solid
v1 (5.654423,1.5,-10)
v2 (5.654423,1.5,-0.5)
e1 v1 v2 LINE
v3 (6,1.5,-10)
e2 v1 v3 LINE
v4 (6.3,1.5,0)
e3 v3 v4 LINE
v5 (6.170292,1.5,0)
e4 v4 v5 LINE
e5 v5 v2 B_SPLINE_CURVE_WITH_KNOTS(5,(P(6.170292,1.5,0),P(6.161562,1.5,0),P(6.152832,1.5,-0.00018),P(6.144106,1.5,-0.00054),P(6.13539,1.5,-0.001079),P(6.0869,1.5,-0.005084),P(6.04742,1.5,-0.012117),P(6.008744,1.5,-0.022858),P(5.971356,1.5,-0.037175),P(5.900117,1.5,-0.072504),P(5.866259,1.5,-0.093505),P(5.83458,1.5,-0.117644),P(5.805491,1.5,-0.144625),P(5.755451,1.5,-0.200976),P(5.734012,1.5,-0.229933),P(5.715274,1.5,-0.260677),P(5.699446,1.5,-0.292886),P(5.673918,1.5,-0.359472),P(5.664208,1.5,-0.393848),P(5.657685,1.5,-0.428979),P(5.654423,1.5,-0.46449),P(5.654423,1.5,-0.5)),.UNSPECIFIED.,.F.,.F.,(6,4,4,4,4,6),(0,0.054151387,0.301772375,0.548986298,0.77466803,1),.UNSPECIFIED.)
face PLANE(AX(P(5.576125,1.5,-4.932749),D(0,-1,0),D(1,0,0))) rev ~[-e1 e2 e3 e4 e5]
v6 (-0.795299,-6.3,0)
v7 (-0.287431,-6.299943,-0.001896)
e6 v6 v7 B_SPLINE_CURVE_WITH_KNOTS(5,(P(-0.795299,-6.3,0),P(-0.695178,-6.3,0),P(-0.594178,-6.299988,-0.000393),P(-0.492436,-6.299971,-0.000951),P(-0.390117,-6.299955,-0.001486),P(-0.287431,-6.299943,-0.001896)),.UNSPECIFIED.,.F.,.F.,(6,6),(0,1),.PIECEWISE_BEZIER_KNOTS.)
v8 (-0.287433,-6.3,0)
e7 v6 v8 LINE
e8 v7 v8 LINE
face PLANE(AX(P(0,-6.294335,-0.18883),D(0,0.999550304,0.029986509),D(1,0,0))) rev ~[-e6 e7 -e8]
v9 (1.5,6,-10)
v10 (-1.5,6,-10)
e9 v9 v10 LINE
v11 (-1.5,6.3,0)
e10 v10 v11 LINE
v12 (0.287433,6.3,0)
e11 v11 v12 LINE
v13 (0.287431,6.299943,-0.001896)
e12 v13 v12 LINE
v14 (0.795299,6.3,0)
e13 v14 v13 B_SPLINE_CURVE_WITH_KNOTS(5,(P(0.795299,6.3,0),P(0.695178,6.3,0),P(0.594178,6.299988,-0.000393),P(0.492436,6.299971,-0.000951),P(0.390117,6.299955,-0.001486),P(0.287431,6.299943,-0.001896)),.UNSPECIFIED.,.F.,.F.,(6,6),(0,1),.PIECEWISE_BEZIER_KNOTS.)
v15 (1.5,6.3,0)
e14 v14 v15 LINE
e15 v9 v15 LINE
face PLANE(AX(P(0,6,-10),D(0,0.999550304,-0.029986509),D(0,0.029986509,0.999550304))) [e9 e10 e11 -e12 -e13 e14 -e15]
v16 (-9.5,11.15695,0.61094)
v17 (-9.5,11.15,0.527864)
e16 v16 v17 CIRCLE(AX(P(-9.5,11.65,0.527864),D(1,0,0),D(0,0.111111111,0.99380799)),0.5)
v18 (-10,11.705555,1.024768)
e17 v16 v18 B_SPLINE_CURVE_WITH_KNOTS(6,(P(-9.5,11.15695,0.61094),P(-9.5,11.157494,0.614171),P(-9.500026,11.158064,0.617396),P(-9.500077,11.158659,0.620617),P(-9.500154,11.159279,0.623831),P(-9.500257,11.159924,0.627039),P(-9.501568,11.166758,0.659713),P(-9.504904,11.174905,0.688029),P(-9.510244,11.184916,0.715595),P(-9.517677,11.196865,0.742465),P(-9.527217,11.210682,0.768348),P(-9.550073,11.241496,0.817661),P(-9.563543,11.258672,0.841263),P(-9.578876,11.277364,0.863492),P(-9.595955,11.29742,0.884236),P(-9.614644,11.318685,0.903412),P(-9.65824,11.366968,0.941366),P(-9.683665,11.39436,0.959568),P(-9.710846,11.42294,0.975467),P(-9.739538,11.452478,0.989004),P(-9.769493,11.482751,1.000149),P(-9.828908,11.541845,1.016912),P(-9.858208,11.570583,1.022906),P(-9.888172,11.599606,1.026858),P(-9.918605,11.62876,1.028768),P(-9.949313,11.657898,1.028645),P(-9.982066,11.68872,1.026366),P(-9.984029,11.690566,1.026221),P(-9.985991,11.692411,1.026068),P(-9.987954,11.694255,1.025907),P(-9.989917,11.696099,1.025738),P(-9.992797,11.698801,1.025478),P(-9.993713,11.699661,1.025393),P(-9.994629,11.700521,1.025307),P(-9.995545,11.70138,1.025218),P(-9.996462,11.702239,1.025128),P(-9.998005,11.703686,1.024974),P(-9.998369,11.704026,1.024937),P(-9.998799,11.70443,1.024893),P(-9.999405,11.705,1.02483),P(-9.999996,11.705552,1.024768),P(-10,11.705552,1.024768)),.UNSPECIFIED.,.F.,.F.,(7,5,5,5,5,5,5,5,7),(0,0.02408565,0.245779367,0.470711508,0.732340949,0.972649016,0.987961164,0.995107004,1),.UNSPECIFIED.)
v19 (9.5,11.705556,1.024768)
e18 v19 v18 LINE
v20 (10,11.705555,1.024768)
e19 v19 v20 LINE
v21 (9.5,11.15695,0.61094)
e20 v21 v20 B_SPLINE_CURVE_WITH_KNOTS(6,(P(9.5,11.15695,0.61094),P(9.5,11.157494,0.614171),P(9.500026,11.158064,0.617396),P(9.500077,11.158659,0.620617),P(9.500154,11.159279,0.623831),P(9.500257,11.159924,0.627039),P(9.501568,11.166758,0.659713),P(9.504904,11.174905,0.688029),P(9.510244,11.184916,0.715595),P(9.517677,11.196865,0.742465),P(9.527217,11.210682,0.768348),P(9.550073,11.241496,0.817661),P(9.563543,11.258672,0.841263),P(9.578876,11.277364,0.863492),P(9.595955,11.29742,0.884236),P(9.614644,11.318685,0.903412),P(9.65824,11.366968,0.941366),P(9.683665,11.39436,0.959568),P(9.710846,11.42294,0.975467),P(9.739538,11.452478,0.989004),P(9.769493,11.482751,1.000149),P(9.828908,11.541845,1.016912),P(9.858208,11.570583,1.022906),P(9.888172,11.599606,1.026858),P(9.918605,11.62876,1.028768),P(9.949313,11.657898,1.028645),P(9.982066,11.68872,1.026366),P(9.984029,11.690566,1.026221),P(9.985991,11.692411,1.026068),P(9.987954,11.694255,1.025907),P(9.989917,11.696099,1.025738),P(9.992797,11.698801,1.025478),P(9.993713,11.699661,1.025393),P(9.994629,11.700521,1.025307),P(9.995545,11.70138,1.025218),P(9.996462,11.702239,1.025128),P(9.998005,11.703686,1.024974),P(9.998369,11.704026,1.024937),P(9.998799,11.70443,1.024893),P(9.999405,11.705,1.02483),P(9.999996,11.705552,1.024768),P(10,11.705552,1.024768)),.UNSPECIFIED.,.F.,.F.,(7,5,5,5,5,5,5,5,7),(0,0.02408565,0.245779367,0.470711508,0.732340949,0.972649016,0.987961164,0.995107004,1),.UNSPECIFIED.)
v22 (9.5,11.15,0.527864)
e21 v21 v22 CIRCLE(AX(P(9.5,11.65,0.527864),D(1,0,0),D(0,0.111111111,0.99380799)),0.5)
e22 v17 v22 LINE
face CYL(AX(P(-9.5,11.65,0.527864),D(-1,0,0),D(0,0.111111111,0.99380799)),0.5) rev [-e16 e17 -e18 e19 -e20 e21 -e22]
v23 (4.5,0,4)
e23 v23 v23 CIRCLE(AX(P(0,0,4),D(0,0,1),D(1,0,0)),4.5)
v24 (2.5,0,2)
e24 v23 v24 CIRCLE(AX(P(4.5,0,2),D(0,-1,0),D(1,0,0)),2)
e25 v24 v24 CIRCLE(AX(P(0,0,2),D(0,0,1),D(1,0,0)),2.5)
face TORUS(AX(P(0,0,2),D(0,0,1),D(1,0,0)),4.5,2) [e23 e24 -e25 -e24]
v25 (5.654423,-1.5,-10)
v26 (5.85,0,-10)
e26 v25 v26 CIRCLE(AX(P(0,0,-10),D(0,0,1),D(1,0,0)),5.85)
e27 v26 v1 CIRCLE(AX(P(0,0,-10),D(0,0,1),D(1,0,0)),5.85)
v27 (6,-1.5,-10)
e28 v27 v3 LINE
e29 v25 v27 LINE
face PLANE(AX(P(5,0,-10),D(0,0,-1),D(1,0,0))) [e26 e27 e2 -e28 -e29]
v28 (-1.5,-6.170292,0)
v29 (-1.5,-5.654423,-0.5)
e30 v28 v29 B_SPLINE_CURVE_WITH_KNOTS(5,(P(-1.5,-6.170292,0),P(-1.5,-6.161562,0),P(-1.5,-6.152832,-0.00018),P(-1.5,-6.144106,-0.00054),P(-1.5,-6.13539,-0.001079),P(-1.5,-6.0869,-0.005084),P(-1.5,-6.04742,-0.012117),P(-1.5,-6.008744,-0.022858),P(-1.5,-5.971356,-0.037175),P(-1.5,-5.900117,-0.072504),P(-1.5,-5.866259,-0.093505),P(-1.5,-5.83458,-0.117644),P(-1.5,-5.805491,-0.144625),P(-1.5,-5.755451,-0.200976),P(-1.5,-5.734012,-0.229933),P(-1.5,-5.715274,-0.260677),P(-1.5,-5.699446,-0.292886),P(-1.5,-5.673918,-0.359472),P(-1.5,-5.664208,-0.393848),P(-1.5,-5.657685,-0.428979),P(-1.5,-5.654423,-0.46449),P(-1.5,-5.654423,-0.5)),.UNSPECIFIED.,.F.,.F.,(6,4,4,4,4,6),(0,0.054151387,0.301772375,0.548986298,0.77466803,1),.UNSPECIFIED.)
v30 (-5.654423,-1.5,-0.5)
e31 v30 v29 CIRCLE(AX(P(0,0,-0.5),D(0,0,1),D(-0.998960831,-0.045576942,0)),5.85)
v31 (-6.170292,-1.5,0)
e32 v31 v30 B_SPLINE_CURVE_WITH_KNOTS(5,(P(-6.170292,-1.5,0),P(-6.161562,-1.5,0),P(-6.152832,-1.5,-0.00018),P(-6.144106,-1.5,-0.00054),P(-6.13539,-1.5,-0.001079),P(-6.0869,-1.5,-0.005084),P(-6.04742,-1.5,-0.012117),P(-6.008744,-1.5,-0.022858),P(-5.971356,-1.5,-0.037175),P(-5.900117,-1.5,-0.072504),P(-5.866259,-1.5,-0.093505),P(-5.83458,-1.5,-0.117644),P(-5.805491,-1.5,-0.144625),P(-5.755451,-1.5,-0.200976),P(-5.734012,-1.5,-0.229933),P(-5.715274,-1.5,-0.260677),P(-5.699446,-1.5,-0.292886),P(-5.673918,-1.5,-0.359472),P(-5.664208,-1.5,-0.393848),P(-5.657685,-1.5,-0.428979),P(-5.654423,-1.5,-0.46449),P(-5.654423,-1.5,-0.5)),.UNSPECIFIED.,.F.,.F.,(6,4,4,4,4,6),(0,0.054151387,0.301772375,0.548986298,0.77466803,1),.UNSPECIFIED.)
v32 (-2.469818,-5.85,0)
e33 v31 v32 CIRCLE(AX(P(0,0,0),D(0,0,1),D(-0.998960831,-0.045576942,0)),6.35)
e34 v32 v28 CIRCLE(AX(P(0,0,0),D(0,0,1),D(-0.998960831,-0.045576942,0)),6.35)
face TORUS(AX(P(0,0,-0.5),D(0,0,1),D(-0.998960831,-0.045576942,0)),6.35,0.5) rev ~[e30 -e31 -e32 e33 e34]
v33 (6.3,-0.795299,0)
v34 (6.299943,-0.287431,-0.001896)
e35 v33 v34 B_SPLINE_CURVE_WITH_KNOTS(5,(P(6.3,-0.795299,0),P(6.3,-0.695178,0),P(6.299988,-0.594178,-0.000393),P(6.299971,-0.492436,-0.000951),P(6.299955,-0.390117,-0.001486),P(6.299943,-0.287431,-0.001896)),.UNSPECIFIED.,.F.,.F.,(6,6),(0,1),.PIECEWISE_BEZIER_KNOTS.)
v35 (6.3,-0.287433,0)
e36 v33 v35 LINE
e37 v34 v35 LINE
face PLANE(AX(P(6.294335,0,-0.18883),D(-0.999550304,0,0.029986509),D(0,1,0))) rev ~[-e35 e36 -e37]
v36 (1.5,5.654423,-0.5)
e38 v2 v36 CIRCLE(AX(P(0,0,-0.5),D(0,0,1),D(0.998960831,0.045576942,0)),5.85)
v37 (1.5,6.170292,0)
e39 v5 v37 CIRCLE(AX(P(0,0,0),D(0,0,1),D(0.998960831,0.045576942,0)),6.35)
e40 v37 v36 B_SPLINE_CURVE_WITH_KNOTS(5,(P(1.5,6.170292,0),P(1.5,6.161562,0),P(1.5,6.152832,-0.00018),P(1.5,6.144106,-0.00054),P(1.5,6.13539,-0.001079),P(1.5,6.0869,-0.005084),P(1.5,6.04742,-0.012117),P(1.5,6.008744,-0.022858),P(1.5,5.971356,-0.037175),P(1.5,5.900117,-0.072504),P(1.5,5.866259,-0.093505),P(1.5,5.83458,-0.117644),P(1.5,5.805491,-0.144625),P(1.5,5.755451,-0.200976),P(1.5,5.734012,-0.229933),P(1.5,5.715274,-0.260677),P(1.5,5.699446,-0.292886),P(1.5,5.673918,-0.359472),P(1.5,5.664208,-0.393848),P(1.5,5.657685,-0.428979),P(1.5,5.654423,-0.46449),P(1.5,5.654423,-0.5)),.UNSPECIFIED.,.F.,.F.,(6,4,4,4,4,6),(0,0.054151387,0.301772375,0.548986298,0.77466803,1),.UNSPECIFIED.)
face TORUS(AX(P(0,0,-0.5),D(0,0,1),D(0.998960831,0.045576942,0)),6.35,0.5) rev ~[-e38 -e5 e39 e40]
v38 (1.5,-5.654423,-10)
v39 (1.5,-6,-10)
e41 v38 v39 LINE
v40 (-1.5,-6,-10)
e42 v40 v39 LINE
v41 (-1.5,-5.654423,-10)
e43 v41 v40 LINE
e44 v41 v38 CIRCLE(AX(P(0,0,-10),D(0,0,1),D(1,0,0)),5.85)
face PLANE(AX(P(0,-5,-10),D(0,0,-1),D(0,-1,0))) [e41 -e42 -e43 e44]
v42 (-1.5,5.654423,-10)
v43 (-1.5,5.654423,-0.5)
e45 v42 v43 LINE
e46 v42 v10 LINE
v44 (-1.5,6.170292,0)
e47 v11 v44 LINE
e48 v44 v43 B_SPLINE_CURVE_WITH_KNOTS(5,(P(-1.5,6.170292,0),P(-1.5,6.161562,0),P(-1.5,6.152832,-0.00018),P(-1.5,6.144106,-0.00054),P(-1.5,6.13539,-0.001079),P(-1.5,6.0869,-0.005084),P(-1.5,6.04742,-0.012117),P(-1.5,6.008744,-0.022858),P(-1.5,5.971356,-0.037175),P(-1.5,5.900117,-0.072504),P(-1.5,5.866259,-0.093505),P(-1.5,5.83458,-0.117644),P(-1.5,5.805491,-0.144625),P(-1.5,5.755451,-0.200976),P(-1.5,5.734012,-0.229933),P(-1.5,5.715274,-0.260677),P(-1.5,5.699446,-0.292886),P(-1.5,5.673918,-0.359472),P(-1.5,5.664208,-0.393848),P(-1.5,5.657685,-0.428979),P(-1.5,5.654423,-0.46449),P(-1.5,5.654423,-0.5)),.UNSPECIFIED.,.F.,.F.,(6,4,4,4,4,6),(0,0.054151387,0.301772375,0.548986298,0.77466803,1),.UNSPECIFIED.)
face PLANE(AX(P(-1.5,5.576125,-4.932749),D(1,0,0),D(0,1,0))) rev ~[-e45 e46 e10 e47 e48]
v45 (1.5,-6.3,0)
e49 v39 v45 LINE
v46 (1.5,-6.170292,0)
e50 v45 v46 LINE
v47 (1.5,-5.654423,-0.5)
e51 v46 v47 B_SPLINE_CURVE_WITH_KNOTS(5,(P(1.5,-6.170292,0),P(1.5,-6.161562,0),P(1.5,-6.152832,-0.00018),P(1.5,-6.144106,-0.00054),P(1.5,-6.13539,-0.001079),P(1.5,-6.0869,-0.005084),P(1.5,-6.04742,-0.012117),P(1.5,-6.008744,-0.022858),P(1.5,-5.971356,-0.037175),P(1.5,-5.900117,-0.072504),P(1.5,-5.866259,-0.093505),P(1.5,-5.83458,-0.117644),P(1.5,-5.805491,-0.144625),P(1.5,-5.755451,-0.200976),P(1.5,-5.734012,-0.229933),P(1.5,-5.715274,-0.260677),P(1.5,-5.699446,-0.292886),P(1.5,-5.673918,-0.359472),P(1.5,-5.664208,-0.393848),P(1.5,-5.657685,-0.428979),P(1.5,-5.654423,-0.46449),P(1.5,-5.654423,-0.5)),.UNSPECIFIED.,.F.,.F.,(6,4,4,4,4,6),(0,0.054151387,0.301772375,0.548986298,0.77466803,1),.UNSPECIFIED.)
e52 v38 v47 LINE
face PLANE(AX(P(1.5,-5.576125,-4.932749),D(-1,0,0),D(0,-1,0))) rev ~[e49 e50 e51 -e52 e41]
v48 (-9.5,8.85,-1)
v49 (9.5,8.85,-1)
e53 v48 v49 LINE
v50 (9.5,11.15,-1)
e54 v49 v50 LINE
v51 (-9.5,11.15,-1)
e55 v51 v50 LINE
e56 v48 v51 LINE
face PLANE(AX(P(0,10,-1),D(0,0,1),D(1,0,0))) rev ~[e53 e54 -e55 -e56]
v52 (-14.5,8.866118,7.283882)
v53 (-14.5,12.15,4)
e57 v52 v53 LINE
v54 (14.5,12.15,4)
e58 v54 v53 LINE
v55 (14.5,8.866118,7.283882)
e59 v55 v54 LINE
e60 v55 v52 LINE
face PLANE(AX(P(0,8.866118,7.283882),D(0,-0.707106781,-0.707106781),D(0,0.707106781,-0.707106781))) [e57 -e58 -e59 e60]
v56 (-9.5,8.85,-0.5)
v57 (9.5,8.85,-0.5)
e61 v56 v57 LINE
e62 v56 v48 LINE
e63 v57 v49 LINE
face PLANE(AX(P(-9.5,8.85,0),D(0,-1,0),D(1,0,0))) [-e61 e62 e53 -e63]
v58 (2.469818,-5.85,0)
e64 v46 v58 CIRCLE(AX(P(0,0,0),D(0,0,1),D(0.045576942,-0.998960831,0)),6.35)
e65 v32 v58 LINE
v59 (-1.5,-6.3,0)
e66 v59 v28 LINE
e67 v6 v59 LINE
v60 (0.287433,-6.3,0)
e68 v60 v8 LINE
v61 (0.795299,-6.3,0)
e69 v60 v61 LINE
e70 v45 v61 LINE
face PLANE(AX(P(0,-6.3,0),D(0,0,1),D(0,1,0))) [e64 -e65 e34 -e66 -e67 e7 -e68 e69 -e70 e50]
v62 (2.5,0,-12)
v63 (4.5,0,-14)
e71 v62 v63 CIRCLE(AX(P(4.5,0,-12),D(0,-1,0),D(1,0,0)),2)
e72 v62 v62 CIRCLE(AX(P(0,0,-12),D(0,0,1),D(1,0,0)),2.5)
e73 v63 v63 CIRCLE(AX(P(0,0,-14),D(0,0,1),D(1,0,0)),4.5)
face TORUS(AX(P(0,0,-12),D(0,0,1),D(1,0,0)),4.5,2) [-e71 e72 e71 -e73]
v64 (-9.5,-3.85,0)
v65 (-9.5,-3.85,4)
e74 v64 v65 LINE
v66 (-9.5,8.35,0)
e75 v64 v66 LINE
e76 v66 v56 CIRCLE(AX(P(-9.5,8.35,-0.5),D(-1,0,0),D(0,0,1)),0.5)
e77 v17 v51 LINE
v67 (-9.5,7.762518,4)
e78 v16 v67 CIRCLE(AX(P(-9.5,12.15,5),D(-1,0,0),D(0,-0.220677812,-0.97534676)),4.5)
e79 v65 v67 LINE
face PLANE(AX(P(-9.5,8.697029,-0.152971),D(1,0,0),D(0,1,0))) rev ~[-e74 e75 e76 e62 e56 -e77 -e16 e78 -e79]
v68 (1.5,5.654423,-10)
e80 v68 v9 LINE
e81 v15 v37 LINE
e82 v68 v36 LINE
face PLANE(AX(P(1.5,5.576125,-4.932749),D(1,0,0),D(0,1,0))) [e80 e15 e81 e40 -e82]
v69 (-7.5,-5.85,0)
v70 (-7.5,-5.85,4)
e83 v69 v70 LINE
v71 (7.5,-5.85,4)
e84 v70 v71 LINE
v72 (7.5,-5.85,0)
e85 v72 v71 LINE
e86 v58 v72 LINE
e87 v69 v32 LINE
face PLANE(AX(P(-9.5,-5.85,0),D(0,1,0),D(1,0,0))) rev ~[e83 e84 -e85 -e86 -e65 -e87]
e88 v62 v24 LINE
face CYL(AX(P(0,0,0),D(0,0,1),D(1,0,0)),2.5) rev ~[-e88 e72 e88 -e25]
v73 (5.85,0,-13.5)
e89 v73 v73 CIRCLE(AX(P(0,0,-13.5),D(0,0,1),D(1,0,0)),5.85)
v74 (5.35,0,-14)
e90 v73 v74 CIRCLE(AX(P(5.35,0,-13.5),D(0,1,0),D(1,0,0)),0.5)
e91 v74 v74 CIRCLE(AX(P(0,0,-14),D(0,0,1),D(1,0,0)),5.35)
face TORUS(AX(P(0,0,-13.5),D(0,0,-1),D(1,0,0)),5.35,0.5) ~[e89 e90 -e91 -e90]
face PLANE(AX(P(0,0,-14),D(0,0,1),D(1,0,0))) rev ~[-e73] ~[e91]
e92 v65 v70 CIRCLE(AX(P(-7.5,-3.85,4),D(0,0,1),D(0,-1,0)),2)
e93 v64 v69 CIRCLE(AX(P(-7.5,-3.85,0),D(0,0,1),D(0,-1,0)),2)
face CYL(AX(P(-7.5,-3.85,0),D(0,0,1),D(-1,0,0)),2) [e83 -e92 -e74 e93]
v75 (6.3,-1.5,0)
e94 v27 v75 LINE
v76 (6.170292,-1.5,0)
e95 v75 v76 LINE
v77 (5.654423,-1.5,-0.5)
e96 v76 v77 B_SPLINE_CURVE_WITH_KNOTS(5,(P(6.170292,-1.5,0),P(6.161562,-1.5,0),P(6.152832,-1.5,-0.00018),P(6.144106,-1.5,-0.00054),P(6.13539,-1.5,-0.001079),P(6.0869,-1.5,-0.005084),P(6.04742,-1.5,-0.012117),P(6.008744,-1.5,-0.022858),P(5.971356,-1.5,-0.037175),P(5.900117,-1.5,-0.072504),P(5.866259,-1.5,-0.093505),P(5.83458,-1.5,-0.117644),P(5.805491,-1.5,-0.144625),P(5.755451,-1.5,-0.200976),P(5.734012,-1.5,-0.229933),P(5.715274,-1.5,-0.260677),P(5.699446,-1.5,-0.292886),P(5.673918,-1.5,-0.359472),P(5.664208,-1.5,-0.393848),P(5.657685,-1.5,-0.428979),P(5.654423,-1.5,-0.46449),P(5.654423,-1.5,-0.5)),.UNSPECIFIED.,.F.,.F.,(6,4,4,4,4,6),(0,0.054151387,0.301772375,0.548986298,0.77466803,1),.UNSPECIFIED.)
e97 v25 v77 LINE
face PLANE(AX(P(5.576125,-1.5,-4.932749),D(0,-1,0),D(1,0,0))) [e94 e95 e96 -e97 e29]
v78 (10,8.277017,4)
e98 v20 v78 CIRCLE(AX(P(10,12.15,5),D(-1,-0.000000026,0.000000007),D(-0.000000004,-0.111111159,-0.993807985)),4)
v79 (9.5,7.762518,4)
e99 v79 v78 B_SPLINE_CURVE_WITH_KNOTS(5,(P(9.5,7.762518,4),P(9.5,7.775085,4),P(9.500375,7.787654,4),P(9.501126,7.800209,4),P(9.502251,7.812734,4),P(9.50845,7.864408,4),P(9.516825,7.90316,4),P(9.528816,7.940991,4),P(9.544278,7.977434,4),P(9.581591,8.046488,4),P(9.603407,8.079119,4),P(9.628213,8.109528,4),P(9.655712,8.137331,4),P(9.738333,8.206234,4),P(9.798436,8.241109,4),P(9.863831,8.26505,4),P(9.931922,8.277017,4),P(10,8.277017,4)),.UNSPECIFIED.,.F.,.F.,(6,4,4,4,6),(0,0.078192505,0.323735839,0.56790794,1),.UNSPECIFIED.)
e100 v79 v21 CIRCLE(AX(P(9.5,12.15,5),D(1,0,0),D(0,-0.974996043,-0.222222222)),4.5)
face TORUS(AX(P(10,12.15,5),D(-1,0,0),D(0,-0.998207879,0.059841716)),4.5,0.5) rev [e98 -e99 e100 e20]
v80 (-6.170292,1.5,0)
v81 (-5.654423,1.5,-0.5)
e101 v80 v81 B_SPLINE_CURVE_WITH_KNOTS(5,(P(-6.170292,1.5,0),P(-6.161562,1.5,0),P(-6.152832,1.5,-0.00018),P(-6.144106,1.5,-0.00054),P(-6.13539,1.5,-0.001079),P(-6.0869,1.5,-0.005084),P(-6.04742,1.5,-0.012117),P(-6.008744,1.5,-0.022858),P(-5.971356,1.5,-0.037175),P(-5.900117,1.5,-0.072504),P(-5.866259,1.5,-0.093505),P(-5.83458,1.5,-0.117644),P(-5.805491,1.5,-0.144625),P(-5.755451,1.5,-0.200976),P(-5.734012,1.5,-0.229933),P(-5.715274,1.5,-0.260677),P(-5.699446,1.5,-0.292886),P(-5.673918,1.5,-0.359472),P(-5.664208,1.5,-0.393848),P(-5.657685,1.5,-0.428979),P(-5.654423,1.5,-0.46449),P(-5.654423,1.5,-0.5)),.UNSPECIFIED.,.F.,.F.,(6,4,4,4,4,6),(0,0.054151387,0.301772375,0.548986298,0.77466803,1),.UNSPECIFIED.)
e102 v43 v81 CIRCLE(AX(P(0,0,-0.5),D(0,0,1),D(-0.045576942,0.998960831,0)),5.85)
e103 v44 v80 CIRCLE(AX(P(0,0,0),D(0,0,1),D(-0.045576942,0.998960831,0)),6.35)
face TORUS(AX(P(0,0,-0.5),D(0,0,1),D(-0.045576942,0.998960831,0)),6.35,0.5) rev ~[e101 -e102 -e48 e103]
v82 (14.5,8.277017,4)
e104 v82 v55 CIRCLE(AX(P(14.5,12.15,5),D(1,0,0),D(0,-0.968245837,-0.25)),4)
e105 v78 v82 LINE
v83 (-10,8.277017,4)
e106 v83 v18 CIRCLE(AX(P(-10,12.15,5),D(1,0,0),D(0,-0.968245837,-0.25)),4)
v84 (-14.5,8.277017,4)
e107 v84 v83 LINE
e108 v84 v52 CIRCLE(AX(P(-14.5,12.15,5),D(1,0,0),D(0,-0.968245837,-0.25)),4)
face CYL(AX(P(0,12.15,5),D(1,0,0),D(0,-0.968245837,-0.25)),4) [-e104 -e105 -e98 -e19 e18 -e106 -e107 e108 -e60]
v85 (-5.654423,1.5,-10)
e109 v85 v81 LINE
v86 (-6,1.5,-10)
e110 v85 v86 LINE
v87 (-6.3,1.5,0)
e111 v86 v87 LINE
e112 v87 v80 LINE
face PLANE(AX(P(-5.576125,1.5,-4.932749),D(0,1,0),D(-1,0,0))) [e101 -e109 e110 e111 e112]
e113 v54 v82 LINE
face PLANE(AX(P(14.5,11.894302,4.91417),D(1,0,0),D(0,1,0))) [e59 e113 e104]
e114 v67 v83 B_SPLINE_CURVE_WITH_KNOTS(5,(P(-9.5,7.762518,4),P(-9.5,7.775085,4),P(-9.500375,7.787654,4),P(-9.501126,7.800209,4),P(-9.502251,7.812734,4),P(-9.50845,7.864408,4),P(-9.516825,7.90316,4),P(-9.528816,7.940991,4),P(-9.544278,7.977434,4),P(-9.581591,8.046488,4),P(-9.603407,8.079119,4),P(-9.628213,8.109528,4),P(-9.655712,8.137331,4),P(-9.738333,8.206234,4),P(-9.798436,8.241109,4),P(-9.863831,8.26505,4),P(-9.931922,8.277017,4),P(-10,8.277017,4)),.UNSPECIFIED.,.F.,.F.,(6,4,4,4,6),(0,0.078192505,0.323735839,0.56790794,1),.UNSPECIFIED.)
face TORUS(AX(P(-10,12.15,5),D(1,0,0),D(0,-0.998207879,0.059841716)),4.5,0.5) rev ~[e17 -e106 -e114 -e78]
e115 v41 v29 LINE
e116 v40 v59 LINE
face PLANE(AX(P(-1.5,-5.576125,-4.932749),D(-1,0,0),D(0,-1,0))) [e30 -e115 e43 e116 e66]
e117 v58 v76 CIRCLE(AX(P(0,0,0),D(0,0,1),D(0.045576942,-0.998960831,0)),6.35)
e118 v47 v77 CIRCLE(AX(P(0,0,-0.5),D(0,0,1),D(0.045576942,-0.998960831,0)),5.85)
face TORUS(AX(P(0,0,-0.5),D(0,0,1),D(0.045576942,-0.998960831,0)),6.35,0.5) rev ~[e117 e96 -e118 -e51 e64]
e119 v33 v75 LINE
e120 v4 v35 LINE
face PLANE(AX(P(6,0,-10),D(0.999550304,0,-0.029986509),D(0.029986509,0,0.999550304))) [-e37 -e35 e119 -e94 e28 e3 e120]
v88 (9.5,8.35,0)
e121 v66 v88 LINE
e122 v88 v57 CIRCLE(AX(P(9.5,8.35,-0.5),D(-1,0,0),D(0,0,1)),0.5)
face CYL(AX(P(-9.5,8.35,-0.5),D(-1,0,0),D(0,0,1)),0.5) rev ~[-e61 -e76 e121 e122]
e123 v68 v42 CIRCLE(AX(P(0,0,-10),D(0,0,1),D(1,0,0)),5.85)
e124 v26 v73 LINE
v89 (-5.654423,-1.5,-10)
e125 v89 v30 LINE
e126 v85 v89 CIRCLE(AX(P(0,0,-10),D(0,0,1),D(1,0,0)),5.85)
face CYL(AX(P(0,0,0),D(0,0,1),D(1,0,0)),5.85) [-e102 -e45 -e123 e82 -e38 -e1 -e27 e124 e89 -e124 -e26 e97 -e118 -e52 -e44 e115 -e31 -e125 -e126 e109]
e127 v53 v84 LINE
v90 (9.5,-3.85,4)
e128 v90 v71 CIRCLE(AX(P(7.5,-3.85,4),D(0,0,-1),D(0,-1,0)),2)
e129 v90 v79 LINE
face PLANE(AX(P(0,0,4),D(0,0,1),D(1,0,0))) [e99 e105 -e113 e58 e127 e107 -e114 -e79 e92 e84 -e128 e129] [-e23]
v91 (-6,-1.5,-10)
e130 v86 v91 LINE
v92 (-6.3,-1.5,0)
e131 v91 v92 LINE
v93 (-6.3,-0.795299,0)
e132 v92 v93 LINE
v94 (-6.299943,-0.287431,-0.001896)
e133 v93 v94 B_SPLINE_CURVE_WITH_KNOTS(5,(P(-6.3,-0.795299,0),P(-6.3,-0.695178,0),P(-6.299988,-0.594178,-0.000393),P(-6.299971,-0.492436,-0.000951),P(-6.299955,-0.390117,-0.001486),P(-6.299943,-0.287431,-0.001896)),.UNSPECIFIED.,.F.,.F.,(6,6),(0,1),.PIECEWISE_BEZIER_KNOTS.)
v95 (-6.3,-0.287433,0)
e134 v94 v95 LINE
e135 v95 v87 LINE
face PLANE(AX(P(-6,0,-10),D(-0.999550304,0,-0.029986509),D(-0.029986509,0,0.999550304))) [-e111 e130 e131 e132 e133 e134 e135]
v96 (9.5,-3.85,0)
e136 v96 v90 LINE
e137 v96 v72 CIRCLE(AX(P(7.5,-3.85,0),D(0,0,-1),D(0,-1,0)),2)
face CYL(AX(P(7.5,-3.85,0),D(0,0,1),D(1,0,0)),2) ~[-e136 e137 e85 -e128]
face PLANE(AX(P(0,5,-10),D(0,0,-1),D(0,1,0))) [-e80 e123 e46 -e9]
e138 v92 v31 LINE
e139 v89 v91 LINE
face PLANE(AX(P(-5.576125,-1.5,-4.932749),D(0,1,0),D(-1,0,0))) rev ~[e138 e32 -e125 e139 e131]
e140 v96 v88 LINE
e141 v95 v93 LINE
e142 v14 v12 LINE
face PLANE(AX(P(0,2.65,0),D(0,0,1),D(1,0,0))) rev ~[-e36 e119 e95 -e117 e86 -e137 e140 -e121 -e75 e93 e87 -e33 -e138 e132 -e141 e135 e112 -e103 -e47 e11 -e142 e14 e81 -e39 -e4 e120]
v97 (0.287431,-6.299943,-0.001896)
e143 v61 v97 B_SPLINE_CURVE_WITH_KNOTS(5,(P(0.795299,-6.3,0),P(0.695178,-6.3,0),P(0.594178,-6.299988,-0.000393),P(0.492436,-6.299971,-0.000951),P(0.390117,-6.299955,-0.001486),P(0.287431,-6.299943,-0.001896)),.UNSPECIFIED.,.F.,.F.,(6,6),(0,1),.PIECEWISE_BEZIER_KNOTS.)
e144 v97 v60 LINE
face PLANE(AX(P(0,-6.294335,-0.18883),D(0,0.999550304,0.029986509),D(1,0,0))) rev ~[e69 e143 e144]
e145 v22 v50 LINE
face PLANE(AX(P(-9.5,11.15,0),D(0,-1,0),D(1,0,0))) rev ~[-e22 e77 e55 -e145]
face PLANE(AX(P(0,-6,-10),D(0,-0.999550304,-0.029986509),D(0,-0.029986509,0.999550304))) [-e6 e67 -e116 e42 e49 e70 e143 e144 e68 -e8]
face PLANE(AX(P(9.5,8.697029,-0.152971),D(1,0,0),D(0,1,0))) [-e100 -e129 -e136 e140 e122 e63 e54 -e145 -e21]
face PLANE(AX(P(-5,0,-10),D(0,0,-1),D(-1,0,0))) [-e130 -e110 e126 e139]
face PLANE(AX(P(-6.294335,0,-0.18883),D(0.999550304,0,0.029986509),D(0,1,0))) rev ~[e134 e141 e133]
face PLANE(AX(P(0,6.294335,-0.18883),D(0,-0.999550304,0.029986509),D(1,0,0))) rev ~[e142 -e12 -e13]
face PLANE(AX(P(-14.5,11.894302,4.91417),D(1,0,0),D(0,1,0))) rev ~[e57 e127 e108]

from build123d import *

# Parameters (mm, degrees)
F0_R            = 5.85
F1_DEPTH        = 14
F2_W            = 19
F2_H            = 17
F3_DEPTH        = 4
F4_W            = 19
F4_H            = 2.3
F5_DEPTH        = 1
F7_DEPTH        = 1.5
F7_COPIES_COUNT = 4
F9_DEPTH        = 14.5
F10_R           = 2.5
F11_DEPTH       = 15
F12_R           = 2
F13_T1_DEPTH    = 19
F13_T6_ANGLE    = 84.7754573572
F13_T12_ANGLE   = 84.7754573572
F13_T18_ANGLE   = 84.7754573572
F13_T24_ANGLE   = 84.7754573572
F13_T30_ANGLE   = 96.86145484
F13_T36_ANGLE   = 96.86145484
F13_T43_ANGLE   = 96.86145484
F13_T47_DEPTH   = 20.497881522
F13_T54_ANGLE   = 96.86145484
F13_T58_DEPTH   = 20.497881522


# Not quite as in the source:
# - a fillet or chamfer that OpenCascade refuses, or shapes differently, is made with other operations: its cross-section is extruded or revolved along the edge and cut away or added
# - a pattern or mirror of a feature is missing from the dataset's text; its kind, count and spacing are read off the source's solid


with BuildPart() as f1:
    # F0 (on Top) → F1 (new body)
    with BuildSketch(Plane.XY):
        Circle(F0_R)
    extrude(amount=-F1_DEPTH)

    # F2 (on Top) → F3 (join)
    with BuildSketch(Plane.XY):
        with Locations((0, 2.65)):
            Rectangle(F2_W, F2_H)
    extrude(amount=F3_DEPTH)

    # F4 (on Top) → F5 (join)
    with BuildSketch(Plane.XY):
        with Locations((0, 10)):
            Rectangle(F4_W, F4_H)
    extrude(amount=-F5_DEPTH)

    # F6 (on Front) → F7 (join, symmetric)
    with BuildSketch(Plane.XZ):
        Polygon((6, -10), (6.3, 0), (5, 0), (5, -10), align=None)
    f7 = extrude(amount=F7_DEPTH, both=True)

    # F7_copies: F7 ×4 about axis
    f7_copies_axis = Axis((0, 0, 0), (0, 0, 1))
    for i in range(1, F7_COPIES_COUNT):
        add(f7.rotate(f7_copies_axis, i * 360 / F7_COPIES_COUNT))

    # F8 (on Right) → F9 (join, symmetric)
    with BuildSketch(Plane.YZ):
        with BuildLine():
            Line((12.15, 4), (8.2770166538, 4))
            ThreePointArc((8.2770166538, 4), (16.0871501864, 4.2937079857), (8.8661178186, 7.2838821814))
            Line((8.8661178186, 7.2838821814), (12.15, 4))
        make_face()
    extrude(amount=F9_DEPTH, both=True)

    # F10 (on Top) → F11 (cut, symmetric)
    with BuildSketch(Plane.XY):
        Circle(F10_R)
    extrude(amount=F11_DEPTH, both=True, mode=Mode.SUBTRACT)

    # F12
    f12_edges = [f1.edges().sort_by_distance(p)[0] for p in [
        (-9.5, -5.85, 2),
        (9.5, -5.85, 2),
        (-2.5, 0, -14),
        (-2.5, 0, 4),
    ]]
    fillet(f12_edges, radius=F12_R)

    # F13: fillet of radius 0.5 on 9 edges, made by hand

    # F13_s2 → F13_t1 (join)
    with BuildSketch(Plane.YZ.offset(-9.5)):
        with BuildLine():
            ThreePointArc((8.35, 0), (8.7035533906, -0.1464466094), (8.85, -0.5))
            Line((8.85, -0.5), (8.85, 0))
            Line((8.85, 0), (8.35, 0))
        make_face()
        with BuildLine():
            ThreePointArc((11.7055555556, 1.02476804), (11.3166666667, 0.9005420413), (11.15, 0.527864045))
            Line((11.15, 0.527864045), (11.15, 1.1270166538))
            ThreePointArc((11.15, 1.1270166538), (11.4259705579, 1.0660730349), (11.7055555556, 1.02476804))
        make_face()
    extrude(amount=F13_T1_DEPTH)


with BuildPart() as f13_tool4:
    # F13_s5 → F13_t6 (revolve)
    with BuildSketch(Plane(origin=(0, 0, 0), x_dir=(0, 0, 1), z_dir=(-0.9989608313, -0.0455769416, 0))):
        with BuildLine():
            ThreePointArc((0, -6.35), (-0.1464466094, -5.9964466094), (-0.5, -5.85))
            Line((-0.5, -5.85), (0, -5.85))
            Line((0, -5.85), (0, -6.35))
        make_face()
    revolve(axis=Axis((0, 0, 0), (0, 0, 1)), revolution_arc=F13_T6_ANGLE)

    split(bisect_by=Plane(origin=(6.2943350984, 0, -0.188830053), x_dir=(0, 1, 0), z_dir=(-0.9995503035, 0, 0.0299865091)), keep=Keep.TOP)

    split(bisect_by=Plane(origin=(0, -6.2943350984, -0.188830053), x_dir=(1, 0, 0), z_dir=(0, 0.9995503035, 0.0299865091)), keep=Keep.TOP)


with BuildPart() as f1_1:
    add(f1.part)

    # F13_t3: union F13_tool4
    add(f13_tool4.part)


with BuildPart() as f13_tool10:
    # F13_s11 → F13_t12 (revolve)
    with BuildSketch(Plane(origin=(0, 0, 0), x_dir=(0, 0, 1), z_dir=(0.0455769416, -0.9989608313, 0))):
        with BuildLine():
            ThreePointArc((0, -6.35), (-0.1464466094, -5.9964466094), (-0.5, -5.85))
            Line((-0.5, -5.85), (0, -5.85))
            Line((0, -5.85), (0, -6.35))
        make_face()
    revolve(axis=Axis((0, 0, 0), (0, 0, 1)), revolution_arc=F13_T12_ANGLE)

    split(bisect_by=Plane.XZ.offset(-1.5), keep=Keep.BOTTOM)

    split(bisect_by=Plane(origin=(0, 6.2943350984, -0.188830053), x_dir=(1, 0, 0), z_dir=(0, -0.9995503035, 0.0299865091)), keep=Keep.TOP)


with BuildPart() as f1_2:
    add(f1_1.part)

    # F13_t9: union F13_tool10
    add(f13_tool10.part)


with BuildPart() as f13_tool16:
    # F13_s17 → F13_t18 (revolve)
    with BuildSketch(Plane(origin=(0, 0, 0), x_dir=(0, 0, 1), z_dir=(0.9989608313, 0.0455769416, 0))):
        with BuildLine():
            ThreePointArc((0, -6.35), (-0.1464466094, -5.9964466094), (-0.5, -5.85))
            Line((-0.5, -5.85), (0, -5.85))
            Line((0, -5.85), (0, -6.35))
        make_face()
    revolve(axis=Axis((0, 0, 0), (0, 0, 1)), revolution_arc=F13_T18_ANGLE)

    split(bisect_by=Plane.XZ.offset(-1.5), keep=Keep.BOTTOM)

    split(bisect_by=Plane.YZ.offset(-1.5), keep=Keep.BOTTOM)


with BuildPart() as f1_3:
    add(f1_2.part)

    # F13_t15: union F13_tool16
    add(f13_tool16.part)


with BuildPart() as f13_tool22:
    # F13_s23 → F13_t24 (revolve)
    with BuildSketch(Plane(origin=(0, 0, 0), x_dir=(0, 0, 1), z_dir=(-0.0455769416, 0.9989608313, 0))):
        with BuildLine():
            ThreePointArc((0, -6.35), (-0.1464466094, -5.9964466094), (-0.5, -5.85))
            Line((-0.5, -5.85), (0, -5.85))
            Line((0, -5.85), (0, -6.35))
        make_face()
    revolve(axis=Axis((0, 0, 0), (0, 0, 1)), revolution_arc=F13_T24_ANGLE)

    split(bisect_by=Plane(origin=(-6.2943350984, 0, -0.188830053), x_dir=(0, 1, 0), z_dir=(0.9995503035, 0, 0.0299865091)), keep=Keep.TOP)

    split(bisect_by=Plane(origin=(0, -6.2943350984, -0.188830053), x_dir=(1, 0, 0), z_dir=(0, 0.9995503035, 0.0299865091)), keep=Keep.TOP)


with BuildPart() as f1_4:
    add(f1_3.part)

    # F13_t21: union F13_tool22
    add(f13_tool22.part)


with BuildPart() as f13_tool28:
    # F13_s29 → F13_t30 (revolve)
    with BuildSketch(Plane(origin=(0, 0.3421818863, 5.7078686812), x_dir=(1, 0, 0), z_dir=(0, 0.0598417157, 0.9982078787))):
        with BuildLine():
            ThreePointArc((-9.5, 7.3290171475), (-9.6464466094, 7.6825705381), (-10, 7.8290171475))
            Line((-10, 7.8290171475), (-9.5, 7.8290171475))
            Line((-9.5, 7.8290171475), (-9.5, 7.3290171475))
        make_face()
    revolve(axis=Axis((-9.5, 12.15, 5), (1, 0, 0)), revolution_arc=F13_T30_ANGLE)

    split(bisect_by=Plane.XY.offset(4), keep=Keep.BOTTOM)

    split(bisect_by=Plane.XZ.offset(-11.15), keep=Keep.TOP)


with BuildPart() as f1_5:
    add(f1_4.part)

    # F13_t27: union F13_tool28
    add(f13_tool28.part)


with BuildPart() as f13_tool34:
    # F13_s35 → F13_t36 (revolve)
    with BuildSketch(Plane(origin=(0, 0.3421818863, 5.7078686812), x_dir=(1, 0, 0), z_dir=(0, 0.0598417157, 0.9982078787))):
        with BuildLine():
            ThreePointArc((9.5, 7.3290171475), (9.6464466094, 7.6825705381), (10, 7.8290171475))
            Line((10, 7.8290171475), (9.5, 7.8290171475))
            Line((9.5, 7.8290171475), (9.5, 7.3290171475))
        make_face()
    revolve(axis=Axis((9.5, 12.15, 5), (1, 0, 0)), revolution_arc=F13_T36_ANGLE)

    split(bisect_by=Plane.XY.offset(4), keep=Keep.BOTTOM)

    split(bisect_by=Plane.XZ.offset(-11.15), keep=Keep.TOP)


with BuildPart() as f1_6:
    add(f1_5.part)

    # F13_t33: union F13_tool34
    add(f13_tool34.part)


with BuildPart() as f13_tool41:
    # F13_s42 → F13_t43 (revolve)
    with BuildSketch(Plane(origin=(0, 0.3421818863, 5.7078686812), x_dir=(1, 0, 0), z_dir=(0, 0.0598417157, 0.9982078787))):
        with BuildLine():
            ThreePointArc((-9.5, 7.3290171475), (-9.6464466094, 7.6825705381), (-10, 7.8290171475))
            Line((-10, 7.8290171475), (-9.5, 7.8290171475))
            Line((-9.5, 7.8290171475), (-9.5, 7.3290171475))
        make_face()
    revolve(axis=Axis((-9.5, 12.15, 5), (1, 0, 0)), revolution_arc=F13_T43_ANGLE)

    split(bisect_by=Plane.XZ.offset(-11.15), keep=Keep.BOTTOM)


with BuildPart() as f13_tool45:
    # F13_s46 → F13_t47 (new body)
    with BuildSketch(Plane.YZ.offset(-10.997881522)):
        with BuildLine():
            ThreePointArc((11.7055555556, 1.02476804), (11.3166666667, 0.9005420413), (11.15, 0.527864045))
            Line((11.15, 0.527864045), (11.15, 1.1270166538))
            ThreePointArc((11.15, 1.1270166538), (11.4259705579, 1.0660730349), (11.7055555556, 1.02476804))
        make_face()
    extrude(amount=F13_T47_DEPTH)

    split(bisect_by=Plane.YZ.offset(-9.5), keep=Keep.BOTTOM)


with BuildPart() as f13_tool41_1:
    add(f13_tool41.part)

    # F13_t49: intersect F13_tool45
    add(f13_tool45.part, mode=Mode.INTERSECT)


with BuildPart() as f1_7:
    add(f1_6.part)

    # F13_t39: union F13_tool41
    add(f13_tool41_1.part)


with BuildPart() as f13_tool52:
    # F13_s53 → F13_t54 (revolve)
    with BuildSketch(Plane(origin=(0, 0.3421818863, 5.7078686812), x_dir=(1, 0, 0), z_dir=(0, 0.0598417157, 0.9982078787))):
        with BuildLine():
            ThreePointArc((9.5, 7.3290171475), (9.6464466094, 7.6825705381), (10, 7.8290171475))
            Line((10, 7.8290171475), (9.5, 7.8290171475))
            Line((9.5, 7.8290171475), (9.5, 7.3290171475))
        make_face()
    revolve(axis=Axis((9.5, 12.15, 5), (1, 0, 0)), revolution_arc=F13_T54_ANGLE)

    split(bisect_by=Plane.XZ.offset(-11.15), keep=Keep.BOTTOM)


with BuildPart() as f13_tool56:
    # F13_s57 → F13_t58 (new body)
    with BuildSketch(Plane.YZ.offset(-9.5)):
        with BuildLine():
            ThreePointArc((11.7055555556, 1.02476804), (11.3166666667, 0.9005420413), (11.15, 0.527864045))
            Line((11.15, 0.527864045), (11.15, 1.1270166538))
            ThreePointArc((11.15, 1.1270166538), (11.4259705579, 1.0660730349), (11.7055555556, 1.02476804))
        make_face()
    extrude(amount=F13_T58_DEPTH)

    split(bisect_by=Plane.YZ.offset(9.5), keep=Keep.TOP)


with BuildPart() as f13_tool52_1:
    add(f13_tool52.part)

    # F13_t60: intersect F13_tool56
    add(f13_tool56.part, mode=Mode.INTERSECT)


with BuildPart() as f1_8:
    add(f1_7.part)

    # F13_t50: union F13_tool52
    add(f13_tool52_1.part)

    # F13_s61 → F13_t62 (revolve, cut)
    with BuildSketch(Plane.XZ):
        with BuildLine():
            ThreePointArc((5.85, -13.5), (5.7035533906, -13.8535533906), (5.35, -14))
            Line((5.35, -14), (5.85, -14))
            Line((5.85, -14), (5.85, -13.5))
        make_face()
    revolve(axis=Axis((0, 0, -14), (0, 0, 1)), mode=Mode.SUBTRACT)


solid = f1_8.part
